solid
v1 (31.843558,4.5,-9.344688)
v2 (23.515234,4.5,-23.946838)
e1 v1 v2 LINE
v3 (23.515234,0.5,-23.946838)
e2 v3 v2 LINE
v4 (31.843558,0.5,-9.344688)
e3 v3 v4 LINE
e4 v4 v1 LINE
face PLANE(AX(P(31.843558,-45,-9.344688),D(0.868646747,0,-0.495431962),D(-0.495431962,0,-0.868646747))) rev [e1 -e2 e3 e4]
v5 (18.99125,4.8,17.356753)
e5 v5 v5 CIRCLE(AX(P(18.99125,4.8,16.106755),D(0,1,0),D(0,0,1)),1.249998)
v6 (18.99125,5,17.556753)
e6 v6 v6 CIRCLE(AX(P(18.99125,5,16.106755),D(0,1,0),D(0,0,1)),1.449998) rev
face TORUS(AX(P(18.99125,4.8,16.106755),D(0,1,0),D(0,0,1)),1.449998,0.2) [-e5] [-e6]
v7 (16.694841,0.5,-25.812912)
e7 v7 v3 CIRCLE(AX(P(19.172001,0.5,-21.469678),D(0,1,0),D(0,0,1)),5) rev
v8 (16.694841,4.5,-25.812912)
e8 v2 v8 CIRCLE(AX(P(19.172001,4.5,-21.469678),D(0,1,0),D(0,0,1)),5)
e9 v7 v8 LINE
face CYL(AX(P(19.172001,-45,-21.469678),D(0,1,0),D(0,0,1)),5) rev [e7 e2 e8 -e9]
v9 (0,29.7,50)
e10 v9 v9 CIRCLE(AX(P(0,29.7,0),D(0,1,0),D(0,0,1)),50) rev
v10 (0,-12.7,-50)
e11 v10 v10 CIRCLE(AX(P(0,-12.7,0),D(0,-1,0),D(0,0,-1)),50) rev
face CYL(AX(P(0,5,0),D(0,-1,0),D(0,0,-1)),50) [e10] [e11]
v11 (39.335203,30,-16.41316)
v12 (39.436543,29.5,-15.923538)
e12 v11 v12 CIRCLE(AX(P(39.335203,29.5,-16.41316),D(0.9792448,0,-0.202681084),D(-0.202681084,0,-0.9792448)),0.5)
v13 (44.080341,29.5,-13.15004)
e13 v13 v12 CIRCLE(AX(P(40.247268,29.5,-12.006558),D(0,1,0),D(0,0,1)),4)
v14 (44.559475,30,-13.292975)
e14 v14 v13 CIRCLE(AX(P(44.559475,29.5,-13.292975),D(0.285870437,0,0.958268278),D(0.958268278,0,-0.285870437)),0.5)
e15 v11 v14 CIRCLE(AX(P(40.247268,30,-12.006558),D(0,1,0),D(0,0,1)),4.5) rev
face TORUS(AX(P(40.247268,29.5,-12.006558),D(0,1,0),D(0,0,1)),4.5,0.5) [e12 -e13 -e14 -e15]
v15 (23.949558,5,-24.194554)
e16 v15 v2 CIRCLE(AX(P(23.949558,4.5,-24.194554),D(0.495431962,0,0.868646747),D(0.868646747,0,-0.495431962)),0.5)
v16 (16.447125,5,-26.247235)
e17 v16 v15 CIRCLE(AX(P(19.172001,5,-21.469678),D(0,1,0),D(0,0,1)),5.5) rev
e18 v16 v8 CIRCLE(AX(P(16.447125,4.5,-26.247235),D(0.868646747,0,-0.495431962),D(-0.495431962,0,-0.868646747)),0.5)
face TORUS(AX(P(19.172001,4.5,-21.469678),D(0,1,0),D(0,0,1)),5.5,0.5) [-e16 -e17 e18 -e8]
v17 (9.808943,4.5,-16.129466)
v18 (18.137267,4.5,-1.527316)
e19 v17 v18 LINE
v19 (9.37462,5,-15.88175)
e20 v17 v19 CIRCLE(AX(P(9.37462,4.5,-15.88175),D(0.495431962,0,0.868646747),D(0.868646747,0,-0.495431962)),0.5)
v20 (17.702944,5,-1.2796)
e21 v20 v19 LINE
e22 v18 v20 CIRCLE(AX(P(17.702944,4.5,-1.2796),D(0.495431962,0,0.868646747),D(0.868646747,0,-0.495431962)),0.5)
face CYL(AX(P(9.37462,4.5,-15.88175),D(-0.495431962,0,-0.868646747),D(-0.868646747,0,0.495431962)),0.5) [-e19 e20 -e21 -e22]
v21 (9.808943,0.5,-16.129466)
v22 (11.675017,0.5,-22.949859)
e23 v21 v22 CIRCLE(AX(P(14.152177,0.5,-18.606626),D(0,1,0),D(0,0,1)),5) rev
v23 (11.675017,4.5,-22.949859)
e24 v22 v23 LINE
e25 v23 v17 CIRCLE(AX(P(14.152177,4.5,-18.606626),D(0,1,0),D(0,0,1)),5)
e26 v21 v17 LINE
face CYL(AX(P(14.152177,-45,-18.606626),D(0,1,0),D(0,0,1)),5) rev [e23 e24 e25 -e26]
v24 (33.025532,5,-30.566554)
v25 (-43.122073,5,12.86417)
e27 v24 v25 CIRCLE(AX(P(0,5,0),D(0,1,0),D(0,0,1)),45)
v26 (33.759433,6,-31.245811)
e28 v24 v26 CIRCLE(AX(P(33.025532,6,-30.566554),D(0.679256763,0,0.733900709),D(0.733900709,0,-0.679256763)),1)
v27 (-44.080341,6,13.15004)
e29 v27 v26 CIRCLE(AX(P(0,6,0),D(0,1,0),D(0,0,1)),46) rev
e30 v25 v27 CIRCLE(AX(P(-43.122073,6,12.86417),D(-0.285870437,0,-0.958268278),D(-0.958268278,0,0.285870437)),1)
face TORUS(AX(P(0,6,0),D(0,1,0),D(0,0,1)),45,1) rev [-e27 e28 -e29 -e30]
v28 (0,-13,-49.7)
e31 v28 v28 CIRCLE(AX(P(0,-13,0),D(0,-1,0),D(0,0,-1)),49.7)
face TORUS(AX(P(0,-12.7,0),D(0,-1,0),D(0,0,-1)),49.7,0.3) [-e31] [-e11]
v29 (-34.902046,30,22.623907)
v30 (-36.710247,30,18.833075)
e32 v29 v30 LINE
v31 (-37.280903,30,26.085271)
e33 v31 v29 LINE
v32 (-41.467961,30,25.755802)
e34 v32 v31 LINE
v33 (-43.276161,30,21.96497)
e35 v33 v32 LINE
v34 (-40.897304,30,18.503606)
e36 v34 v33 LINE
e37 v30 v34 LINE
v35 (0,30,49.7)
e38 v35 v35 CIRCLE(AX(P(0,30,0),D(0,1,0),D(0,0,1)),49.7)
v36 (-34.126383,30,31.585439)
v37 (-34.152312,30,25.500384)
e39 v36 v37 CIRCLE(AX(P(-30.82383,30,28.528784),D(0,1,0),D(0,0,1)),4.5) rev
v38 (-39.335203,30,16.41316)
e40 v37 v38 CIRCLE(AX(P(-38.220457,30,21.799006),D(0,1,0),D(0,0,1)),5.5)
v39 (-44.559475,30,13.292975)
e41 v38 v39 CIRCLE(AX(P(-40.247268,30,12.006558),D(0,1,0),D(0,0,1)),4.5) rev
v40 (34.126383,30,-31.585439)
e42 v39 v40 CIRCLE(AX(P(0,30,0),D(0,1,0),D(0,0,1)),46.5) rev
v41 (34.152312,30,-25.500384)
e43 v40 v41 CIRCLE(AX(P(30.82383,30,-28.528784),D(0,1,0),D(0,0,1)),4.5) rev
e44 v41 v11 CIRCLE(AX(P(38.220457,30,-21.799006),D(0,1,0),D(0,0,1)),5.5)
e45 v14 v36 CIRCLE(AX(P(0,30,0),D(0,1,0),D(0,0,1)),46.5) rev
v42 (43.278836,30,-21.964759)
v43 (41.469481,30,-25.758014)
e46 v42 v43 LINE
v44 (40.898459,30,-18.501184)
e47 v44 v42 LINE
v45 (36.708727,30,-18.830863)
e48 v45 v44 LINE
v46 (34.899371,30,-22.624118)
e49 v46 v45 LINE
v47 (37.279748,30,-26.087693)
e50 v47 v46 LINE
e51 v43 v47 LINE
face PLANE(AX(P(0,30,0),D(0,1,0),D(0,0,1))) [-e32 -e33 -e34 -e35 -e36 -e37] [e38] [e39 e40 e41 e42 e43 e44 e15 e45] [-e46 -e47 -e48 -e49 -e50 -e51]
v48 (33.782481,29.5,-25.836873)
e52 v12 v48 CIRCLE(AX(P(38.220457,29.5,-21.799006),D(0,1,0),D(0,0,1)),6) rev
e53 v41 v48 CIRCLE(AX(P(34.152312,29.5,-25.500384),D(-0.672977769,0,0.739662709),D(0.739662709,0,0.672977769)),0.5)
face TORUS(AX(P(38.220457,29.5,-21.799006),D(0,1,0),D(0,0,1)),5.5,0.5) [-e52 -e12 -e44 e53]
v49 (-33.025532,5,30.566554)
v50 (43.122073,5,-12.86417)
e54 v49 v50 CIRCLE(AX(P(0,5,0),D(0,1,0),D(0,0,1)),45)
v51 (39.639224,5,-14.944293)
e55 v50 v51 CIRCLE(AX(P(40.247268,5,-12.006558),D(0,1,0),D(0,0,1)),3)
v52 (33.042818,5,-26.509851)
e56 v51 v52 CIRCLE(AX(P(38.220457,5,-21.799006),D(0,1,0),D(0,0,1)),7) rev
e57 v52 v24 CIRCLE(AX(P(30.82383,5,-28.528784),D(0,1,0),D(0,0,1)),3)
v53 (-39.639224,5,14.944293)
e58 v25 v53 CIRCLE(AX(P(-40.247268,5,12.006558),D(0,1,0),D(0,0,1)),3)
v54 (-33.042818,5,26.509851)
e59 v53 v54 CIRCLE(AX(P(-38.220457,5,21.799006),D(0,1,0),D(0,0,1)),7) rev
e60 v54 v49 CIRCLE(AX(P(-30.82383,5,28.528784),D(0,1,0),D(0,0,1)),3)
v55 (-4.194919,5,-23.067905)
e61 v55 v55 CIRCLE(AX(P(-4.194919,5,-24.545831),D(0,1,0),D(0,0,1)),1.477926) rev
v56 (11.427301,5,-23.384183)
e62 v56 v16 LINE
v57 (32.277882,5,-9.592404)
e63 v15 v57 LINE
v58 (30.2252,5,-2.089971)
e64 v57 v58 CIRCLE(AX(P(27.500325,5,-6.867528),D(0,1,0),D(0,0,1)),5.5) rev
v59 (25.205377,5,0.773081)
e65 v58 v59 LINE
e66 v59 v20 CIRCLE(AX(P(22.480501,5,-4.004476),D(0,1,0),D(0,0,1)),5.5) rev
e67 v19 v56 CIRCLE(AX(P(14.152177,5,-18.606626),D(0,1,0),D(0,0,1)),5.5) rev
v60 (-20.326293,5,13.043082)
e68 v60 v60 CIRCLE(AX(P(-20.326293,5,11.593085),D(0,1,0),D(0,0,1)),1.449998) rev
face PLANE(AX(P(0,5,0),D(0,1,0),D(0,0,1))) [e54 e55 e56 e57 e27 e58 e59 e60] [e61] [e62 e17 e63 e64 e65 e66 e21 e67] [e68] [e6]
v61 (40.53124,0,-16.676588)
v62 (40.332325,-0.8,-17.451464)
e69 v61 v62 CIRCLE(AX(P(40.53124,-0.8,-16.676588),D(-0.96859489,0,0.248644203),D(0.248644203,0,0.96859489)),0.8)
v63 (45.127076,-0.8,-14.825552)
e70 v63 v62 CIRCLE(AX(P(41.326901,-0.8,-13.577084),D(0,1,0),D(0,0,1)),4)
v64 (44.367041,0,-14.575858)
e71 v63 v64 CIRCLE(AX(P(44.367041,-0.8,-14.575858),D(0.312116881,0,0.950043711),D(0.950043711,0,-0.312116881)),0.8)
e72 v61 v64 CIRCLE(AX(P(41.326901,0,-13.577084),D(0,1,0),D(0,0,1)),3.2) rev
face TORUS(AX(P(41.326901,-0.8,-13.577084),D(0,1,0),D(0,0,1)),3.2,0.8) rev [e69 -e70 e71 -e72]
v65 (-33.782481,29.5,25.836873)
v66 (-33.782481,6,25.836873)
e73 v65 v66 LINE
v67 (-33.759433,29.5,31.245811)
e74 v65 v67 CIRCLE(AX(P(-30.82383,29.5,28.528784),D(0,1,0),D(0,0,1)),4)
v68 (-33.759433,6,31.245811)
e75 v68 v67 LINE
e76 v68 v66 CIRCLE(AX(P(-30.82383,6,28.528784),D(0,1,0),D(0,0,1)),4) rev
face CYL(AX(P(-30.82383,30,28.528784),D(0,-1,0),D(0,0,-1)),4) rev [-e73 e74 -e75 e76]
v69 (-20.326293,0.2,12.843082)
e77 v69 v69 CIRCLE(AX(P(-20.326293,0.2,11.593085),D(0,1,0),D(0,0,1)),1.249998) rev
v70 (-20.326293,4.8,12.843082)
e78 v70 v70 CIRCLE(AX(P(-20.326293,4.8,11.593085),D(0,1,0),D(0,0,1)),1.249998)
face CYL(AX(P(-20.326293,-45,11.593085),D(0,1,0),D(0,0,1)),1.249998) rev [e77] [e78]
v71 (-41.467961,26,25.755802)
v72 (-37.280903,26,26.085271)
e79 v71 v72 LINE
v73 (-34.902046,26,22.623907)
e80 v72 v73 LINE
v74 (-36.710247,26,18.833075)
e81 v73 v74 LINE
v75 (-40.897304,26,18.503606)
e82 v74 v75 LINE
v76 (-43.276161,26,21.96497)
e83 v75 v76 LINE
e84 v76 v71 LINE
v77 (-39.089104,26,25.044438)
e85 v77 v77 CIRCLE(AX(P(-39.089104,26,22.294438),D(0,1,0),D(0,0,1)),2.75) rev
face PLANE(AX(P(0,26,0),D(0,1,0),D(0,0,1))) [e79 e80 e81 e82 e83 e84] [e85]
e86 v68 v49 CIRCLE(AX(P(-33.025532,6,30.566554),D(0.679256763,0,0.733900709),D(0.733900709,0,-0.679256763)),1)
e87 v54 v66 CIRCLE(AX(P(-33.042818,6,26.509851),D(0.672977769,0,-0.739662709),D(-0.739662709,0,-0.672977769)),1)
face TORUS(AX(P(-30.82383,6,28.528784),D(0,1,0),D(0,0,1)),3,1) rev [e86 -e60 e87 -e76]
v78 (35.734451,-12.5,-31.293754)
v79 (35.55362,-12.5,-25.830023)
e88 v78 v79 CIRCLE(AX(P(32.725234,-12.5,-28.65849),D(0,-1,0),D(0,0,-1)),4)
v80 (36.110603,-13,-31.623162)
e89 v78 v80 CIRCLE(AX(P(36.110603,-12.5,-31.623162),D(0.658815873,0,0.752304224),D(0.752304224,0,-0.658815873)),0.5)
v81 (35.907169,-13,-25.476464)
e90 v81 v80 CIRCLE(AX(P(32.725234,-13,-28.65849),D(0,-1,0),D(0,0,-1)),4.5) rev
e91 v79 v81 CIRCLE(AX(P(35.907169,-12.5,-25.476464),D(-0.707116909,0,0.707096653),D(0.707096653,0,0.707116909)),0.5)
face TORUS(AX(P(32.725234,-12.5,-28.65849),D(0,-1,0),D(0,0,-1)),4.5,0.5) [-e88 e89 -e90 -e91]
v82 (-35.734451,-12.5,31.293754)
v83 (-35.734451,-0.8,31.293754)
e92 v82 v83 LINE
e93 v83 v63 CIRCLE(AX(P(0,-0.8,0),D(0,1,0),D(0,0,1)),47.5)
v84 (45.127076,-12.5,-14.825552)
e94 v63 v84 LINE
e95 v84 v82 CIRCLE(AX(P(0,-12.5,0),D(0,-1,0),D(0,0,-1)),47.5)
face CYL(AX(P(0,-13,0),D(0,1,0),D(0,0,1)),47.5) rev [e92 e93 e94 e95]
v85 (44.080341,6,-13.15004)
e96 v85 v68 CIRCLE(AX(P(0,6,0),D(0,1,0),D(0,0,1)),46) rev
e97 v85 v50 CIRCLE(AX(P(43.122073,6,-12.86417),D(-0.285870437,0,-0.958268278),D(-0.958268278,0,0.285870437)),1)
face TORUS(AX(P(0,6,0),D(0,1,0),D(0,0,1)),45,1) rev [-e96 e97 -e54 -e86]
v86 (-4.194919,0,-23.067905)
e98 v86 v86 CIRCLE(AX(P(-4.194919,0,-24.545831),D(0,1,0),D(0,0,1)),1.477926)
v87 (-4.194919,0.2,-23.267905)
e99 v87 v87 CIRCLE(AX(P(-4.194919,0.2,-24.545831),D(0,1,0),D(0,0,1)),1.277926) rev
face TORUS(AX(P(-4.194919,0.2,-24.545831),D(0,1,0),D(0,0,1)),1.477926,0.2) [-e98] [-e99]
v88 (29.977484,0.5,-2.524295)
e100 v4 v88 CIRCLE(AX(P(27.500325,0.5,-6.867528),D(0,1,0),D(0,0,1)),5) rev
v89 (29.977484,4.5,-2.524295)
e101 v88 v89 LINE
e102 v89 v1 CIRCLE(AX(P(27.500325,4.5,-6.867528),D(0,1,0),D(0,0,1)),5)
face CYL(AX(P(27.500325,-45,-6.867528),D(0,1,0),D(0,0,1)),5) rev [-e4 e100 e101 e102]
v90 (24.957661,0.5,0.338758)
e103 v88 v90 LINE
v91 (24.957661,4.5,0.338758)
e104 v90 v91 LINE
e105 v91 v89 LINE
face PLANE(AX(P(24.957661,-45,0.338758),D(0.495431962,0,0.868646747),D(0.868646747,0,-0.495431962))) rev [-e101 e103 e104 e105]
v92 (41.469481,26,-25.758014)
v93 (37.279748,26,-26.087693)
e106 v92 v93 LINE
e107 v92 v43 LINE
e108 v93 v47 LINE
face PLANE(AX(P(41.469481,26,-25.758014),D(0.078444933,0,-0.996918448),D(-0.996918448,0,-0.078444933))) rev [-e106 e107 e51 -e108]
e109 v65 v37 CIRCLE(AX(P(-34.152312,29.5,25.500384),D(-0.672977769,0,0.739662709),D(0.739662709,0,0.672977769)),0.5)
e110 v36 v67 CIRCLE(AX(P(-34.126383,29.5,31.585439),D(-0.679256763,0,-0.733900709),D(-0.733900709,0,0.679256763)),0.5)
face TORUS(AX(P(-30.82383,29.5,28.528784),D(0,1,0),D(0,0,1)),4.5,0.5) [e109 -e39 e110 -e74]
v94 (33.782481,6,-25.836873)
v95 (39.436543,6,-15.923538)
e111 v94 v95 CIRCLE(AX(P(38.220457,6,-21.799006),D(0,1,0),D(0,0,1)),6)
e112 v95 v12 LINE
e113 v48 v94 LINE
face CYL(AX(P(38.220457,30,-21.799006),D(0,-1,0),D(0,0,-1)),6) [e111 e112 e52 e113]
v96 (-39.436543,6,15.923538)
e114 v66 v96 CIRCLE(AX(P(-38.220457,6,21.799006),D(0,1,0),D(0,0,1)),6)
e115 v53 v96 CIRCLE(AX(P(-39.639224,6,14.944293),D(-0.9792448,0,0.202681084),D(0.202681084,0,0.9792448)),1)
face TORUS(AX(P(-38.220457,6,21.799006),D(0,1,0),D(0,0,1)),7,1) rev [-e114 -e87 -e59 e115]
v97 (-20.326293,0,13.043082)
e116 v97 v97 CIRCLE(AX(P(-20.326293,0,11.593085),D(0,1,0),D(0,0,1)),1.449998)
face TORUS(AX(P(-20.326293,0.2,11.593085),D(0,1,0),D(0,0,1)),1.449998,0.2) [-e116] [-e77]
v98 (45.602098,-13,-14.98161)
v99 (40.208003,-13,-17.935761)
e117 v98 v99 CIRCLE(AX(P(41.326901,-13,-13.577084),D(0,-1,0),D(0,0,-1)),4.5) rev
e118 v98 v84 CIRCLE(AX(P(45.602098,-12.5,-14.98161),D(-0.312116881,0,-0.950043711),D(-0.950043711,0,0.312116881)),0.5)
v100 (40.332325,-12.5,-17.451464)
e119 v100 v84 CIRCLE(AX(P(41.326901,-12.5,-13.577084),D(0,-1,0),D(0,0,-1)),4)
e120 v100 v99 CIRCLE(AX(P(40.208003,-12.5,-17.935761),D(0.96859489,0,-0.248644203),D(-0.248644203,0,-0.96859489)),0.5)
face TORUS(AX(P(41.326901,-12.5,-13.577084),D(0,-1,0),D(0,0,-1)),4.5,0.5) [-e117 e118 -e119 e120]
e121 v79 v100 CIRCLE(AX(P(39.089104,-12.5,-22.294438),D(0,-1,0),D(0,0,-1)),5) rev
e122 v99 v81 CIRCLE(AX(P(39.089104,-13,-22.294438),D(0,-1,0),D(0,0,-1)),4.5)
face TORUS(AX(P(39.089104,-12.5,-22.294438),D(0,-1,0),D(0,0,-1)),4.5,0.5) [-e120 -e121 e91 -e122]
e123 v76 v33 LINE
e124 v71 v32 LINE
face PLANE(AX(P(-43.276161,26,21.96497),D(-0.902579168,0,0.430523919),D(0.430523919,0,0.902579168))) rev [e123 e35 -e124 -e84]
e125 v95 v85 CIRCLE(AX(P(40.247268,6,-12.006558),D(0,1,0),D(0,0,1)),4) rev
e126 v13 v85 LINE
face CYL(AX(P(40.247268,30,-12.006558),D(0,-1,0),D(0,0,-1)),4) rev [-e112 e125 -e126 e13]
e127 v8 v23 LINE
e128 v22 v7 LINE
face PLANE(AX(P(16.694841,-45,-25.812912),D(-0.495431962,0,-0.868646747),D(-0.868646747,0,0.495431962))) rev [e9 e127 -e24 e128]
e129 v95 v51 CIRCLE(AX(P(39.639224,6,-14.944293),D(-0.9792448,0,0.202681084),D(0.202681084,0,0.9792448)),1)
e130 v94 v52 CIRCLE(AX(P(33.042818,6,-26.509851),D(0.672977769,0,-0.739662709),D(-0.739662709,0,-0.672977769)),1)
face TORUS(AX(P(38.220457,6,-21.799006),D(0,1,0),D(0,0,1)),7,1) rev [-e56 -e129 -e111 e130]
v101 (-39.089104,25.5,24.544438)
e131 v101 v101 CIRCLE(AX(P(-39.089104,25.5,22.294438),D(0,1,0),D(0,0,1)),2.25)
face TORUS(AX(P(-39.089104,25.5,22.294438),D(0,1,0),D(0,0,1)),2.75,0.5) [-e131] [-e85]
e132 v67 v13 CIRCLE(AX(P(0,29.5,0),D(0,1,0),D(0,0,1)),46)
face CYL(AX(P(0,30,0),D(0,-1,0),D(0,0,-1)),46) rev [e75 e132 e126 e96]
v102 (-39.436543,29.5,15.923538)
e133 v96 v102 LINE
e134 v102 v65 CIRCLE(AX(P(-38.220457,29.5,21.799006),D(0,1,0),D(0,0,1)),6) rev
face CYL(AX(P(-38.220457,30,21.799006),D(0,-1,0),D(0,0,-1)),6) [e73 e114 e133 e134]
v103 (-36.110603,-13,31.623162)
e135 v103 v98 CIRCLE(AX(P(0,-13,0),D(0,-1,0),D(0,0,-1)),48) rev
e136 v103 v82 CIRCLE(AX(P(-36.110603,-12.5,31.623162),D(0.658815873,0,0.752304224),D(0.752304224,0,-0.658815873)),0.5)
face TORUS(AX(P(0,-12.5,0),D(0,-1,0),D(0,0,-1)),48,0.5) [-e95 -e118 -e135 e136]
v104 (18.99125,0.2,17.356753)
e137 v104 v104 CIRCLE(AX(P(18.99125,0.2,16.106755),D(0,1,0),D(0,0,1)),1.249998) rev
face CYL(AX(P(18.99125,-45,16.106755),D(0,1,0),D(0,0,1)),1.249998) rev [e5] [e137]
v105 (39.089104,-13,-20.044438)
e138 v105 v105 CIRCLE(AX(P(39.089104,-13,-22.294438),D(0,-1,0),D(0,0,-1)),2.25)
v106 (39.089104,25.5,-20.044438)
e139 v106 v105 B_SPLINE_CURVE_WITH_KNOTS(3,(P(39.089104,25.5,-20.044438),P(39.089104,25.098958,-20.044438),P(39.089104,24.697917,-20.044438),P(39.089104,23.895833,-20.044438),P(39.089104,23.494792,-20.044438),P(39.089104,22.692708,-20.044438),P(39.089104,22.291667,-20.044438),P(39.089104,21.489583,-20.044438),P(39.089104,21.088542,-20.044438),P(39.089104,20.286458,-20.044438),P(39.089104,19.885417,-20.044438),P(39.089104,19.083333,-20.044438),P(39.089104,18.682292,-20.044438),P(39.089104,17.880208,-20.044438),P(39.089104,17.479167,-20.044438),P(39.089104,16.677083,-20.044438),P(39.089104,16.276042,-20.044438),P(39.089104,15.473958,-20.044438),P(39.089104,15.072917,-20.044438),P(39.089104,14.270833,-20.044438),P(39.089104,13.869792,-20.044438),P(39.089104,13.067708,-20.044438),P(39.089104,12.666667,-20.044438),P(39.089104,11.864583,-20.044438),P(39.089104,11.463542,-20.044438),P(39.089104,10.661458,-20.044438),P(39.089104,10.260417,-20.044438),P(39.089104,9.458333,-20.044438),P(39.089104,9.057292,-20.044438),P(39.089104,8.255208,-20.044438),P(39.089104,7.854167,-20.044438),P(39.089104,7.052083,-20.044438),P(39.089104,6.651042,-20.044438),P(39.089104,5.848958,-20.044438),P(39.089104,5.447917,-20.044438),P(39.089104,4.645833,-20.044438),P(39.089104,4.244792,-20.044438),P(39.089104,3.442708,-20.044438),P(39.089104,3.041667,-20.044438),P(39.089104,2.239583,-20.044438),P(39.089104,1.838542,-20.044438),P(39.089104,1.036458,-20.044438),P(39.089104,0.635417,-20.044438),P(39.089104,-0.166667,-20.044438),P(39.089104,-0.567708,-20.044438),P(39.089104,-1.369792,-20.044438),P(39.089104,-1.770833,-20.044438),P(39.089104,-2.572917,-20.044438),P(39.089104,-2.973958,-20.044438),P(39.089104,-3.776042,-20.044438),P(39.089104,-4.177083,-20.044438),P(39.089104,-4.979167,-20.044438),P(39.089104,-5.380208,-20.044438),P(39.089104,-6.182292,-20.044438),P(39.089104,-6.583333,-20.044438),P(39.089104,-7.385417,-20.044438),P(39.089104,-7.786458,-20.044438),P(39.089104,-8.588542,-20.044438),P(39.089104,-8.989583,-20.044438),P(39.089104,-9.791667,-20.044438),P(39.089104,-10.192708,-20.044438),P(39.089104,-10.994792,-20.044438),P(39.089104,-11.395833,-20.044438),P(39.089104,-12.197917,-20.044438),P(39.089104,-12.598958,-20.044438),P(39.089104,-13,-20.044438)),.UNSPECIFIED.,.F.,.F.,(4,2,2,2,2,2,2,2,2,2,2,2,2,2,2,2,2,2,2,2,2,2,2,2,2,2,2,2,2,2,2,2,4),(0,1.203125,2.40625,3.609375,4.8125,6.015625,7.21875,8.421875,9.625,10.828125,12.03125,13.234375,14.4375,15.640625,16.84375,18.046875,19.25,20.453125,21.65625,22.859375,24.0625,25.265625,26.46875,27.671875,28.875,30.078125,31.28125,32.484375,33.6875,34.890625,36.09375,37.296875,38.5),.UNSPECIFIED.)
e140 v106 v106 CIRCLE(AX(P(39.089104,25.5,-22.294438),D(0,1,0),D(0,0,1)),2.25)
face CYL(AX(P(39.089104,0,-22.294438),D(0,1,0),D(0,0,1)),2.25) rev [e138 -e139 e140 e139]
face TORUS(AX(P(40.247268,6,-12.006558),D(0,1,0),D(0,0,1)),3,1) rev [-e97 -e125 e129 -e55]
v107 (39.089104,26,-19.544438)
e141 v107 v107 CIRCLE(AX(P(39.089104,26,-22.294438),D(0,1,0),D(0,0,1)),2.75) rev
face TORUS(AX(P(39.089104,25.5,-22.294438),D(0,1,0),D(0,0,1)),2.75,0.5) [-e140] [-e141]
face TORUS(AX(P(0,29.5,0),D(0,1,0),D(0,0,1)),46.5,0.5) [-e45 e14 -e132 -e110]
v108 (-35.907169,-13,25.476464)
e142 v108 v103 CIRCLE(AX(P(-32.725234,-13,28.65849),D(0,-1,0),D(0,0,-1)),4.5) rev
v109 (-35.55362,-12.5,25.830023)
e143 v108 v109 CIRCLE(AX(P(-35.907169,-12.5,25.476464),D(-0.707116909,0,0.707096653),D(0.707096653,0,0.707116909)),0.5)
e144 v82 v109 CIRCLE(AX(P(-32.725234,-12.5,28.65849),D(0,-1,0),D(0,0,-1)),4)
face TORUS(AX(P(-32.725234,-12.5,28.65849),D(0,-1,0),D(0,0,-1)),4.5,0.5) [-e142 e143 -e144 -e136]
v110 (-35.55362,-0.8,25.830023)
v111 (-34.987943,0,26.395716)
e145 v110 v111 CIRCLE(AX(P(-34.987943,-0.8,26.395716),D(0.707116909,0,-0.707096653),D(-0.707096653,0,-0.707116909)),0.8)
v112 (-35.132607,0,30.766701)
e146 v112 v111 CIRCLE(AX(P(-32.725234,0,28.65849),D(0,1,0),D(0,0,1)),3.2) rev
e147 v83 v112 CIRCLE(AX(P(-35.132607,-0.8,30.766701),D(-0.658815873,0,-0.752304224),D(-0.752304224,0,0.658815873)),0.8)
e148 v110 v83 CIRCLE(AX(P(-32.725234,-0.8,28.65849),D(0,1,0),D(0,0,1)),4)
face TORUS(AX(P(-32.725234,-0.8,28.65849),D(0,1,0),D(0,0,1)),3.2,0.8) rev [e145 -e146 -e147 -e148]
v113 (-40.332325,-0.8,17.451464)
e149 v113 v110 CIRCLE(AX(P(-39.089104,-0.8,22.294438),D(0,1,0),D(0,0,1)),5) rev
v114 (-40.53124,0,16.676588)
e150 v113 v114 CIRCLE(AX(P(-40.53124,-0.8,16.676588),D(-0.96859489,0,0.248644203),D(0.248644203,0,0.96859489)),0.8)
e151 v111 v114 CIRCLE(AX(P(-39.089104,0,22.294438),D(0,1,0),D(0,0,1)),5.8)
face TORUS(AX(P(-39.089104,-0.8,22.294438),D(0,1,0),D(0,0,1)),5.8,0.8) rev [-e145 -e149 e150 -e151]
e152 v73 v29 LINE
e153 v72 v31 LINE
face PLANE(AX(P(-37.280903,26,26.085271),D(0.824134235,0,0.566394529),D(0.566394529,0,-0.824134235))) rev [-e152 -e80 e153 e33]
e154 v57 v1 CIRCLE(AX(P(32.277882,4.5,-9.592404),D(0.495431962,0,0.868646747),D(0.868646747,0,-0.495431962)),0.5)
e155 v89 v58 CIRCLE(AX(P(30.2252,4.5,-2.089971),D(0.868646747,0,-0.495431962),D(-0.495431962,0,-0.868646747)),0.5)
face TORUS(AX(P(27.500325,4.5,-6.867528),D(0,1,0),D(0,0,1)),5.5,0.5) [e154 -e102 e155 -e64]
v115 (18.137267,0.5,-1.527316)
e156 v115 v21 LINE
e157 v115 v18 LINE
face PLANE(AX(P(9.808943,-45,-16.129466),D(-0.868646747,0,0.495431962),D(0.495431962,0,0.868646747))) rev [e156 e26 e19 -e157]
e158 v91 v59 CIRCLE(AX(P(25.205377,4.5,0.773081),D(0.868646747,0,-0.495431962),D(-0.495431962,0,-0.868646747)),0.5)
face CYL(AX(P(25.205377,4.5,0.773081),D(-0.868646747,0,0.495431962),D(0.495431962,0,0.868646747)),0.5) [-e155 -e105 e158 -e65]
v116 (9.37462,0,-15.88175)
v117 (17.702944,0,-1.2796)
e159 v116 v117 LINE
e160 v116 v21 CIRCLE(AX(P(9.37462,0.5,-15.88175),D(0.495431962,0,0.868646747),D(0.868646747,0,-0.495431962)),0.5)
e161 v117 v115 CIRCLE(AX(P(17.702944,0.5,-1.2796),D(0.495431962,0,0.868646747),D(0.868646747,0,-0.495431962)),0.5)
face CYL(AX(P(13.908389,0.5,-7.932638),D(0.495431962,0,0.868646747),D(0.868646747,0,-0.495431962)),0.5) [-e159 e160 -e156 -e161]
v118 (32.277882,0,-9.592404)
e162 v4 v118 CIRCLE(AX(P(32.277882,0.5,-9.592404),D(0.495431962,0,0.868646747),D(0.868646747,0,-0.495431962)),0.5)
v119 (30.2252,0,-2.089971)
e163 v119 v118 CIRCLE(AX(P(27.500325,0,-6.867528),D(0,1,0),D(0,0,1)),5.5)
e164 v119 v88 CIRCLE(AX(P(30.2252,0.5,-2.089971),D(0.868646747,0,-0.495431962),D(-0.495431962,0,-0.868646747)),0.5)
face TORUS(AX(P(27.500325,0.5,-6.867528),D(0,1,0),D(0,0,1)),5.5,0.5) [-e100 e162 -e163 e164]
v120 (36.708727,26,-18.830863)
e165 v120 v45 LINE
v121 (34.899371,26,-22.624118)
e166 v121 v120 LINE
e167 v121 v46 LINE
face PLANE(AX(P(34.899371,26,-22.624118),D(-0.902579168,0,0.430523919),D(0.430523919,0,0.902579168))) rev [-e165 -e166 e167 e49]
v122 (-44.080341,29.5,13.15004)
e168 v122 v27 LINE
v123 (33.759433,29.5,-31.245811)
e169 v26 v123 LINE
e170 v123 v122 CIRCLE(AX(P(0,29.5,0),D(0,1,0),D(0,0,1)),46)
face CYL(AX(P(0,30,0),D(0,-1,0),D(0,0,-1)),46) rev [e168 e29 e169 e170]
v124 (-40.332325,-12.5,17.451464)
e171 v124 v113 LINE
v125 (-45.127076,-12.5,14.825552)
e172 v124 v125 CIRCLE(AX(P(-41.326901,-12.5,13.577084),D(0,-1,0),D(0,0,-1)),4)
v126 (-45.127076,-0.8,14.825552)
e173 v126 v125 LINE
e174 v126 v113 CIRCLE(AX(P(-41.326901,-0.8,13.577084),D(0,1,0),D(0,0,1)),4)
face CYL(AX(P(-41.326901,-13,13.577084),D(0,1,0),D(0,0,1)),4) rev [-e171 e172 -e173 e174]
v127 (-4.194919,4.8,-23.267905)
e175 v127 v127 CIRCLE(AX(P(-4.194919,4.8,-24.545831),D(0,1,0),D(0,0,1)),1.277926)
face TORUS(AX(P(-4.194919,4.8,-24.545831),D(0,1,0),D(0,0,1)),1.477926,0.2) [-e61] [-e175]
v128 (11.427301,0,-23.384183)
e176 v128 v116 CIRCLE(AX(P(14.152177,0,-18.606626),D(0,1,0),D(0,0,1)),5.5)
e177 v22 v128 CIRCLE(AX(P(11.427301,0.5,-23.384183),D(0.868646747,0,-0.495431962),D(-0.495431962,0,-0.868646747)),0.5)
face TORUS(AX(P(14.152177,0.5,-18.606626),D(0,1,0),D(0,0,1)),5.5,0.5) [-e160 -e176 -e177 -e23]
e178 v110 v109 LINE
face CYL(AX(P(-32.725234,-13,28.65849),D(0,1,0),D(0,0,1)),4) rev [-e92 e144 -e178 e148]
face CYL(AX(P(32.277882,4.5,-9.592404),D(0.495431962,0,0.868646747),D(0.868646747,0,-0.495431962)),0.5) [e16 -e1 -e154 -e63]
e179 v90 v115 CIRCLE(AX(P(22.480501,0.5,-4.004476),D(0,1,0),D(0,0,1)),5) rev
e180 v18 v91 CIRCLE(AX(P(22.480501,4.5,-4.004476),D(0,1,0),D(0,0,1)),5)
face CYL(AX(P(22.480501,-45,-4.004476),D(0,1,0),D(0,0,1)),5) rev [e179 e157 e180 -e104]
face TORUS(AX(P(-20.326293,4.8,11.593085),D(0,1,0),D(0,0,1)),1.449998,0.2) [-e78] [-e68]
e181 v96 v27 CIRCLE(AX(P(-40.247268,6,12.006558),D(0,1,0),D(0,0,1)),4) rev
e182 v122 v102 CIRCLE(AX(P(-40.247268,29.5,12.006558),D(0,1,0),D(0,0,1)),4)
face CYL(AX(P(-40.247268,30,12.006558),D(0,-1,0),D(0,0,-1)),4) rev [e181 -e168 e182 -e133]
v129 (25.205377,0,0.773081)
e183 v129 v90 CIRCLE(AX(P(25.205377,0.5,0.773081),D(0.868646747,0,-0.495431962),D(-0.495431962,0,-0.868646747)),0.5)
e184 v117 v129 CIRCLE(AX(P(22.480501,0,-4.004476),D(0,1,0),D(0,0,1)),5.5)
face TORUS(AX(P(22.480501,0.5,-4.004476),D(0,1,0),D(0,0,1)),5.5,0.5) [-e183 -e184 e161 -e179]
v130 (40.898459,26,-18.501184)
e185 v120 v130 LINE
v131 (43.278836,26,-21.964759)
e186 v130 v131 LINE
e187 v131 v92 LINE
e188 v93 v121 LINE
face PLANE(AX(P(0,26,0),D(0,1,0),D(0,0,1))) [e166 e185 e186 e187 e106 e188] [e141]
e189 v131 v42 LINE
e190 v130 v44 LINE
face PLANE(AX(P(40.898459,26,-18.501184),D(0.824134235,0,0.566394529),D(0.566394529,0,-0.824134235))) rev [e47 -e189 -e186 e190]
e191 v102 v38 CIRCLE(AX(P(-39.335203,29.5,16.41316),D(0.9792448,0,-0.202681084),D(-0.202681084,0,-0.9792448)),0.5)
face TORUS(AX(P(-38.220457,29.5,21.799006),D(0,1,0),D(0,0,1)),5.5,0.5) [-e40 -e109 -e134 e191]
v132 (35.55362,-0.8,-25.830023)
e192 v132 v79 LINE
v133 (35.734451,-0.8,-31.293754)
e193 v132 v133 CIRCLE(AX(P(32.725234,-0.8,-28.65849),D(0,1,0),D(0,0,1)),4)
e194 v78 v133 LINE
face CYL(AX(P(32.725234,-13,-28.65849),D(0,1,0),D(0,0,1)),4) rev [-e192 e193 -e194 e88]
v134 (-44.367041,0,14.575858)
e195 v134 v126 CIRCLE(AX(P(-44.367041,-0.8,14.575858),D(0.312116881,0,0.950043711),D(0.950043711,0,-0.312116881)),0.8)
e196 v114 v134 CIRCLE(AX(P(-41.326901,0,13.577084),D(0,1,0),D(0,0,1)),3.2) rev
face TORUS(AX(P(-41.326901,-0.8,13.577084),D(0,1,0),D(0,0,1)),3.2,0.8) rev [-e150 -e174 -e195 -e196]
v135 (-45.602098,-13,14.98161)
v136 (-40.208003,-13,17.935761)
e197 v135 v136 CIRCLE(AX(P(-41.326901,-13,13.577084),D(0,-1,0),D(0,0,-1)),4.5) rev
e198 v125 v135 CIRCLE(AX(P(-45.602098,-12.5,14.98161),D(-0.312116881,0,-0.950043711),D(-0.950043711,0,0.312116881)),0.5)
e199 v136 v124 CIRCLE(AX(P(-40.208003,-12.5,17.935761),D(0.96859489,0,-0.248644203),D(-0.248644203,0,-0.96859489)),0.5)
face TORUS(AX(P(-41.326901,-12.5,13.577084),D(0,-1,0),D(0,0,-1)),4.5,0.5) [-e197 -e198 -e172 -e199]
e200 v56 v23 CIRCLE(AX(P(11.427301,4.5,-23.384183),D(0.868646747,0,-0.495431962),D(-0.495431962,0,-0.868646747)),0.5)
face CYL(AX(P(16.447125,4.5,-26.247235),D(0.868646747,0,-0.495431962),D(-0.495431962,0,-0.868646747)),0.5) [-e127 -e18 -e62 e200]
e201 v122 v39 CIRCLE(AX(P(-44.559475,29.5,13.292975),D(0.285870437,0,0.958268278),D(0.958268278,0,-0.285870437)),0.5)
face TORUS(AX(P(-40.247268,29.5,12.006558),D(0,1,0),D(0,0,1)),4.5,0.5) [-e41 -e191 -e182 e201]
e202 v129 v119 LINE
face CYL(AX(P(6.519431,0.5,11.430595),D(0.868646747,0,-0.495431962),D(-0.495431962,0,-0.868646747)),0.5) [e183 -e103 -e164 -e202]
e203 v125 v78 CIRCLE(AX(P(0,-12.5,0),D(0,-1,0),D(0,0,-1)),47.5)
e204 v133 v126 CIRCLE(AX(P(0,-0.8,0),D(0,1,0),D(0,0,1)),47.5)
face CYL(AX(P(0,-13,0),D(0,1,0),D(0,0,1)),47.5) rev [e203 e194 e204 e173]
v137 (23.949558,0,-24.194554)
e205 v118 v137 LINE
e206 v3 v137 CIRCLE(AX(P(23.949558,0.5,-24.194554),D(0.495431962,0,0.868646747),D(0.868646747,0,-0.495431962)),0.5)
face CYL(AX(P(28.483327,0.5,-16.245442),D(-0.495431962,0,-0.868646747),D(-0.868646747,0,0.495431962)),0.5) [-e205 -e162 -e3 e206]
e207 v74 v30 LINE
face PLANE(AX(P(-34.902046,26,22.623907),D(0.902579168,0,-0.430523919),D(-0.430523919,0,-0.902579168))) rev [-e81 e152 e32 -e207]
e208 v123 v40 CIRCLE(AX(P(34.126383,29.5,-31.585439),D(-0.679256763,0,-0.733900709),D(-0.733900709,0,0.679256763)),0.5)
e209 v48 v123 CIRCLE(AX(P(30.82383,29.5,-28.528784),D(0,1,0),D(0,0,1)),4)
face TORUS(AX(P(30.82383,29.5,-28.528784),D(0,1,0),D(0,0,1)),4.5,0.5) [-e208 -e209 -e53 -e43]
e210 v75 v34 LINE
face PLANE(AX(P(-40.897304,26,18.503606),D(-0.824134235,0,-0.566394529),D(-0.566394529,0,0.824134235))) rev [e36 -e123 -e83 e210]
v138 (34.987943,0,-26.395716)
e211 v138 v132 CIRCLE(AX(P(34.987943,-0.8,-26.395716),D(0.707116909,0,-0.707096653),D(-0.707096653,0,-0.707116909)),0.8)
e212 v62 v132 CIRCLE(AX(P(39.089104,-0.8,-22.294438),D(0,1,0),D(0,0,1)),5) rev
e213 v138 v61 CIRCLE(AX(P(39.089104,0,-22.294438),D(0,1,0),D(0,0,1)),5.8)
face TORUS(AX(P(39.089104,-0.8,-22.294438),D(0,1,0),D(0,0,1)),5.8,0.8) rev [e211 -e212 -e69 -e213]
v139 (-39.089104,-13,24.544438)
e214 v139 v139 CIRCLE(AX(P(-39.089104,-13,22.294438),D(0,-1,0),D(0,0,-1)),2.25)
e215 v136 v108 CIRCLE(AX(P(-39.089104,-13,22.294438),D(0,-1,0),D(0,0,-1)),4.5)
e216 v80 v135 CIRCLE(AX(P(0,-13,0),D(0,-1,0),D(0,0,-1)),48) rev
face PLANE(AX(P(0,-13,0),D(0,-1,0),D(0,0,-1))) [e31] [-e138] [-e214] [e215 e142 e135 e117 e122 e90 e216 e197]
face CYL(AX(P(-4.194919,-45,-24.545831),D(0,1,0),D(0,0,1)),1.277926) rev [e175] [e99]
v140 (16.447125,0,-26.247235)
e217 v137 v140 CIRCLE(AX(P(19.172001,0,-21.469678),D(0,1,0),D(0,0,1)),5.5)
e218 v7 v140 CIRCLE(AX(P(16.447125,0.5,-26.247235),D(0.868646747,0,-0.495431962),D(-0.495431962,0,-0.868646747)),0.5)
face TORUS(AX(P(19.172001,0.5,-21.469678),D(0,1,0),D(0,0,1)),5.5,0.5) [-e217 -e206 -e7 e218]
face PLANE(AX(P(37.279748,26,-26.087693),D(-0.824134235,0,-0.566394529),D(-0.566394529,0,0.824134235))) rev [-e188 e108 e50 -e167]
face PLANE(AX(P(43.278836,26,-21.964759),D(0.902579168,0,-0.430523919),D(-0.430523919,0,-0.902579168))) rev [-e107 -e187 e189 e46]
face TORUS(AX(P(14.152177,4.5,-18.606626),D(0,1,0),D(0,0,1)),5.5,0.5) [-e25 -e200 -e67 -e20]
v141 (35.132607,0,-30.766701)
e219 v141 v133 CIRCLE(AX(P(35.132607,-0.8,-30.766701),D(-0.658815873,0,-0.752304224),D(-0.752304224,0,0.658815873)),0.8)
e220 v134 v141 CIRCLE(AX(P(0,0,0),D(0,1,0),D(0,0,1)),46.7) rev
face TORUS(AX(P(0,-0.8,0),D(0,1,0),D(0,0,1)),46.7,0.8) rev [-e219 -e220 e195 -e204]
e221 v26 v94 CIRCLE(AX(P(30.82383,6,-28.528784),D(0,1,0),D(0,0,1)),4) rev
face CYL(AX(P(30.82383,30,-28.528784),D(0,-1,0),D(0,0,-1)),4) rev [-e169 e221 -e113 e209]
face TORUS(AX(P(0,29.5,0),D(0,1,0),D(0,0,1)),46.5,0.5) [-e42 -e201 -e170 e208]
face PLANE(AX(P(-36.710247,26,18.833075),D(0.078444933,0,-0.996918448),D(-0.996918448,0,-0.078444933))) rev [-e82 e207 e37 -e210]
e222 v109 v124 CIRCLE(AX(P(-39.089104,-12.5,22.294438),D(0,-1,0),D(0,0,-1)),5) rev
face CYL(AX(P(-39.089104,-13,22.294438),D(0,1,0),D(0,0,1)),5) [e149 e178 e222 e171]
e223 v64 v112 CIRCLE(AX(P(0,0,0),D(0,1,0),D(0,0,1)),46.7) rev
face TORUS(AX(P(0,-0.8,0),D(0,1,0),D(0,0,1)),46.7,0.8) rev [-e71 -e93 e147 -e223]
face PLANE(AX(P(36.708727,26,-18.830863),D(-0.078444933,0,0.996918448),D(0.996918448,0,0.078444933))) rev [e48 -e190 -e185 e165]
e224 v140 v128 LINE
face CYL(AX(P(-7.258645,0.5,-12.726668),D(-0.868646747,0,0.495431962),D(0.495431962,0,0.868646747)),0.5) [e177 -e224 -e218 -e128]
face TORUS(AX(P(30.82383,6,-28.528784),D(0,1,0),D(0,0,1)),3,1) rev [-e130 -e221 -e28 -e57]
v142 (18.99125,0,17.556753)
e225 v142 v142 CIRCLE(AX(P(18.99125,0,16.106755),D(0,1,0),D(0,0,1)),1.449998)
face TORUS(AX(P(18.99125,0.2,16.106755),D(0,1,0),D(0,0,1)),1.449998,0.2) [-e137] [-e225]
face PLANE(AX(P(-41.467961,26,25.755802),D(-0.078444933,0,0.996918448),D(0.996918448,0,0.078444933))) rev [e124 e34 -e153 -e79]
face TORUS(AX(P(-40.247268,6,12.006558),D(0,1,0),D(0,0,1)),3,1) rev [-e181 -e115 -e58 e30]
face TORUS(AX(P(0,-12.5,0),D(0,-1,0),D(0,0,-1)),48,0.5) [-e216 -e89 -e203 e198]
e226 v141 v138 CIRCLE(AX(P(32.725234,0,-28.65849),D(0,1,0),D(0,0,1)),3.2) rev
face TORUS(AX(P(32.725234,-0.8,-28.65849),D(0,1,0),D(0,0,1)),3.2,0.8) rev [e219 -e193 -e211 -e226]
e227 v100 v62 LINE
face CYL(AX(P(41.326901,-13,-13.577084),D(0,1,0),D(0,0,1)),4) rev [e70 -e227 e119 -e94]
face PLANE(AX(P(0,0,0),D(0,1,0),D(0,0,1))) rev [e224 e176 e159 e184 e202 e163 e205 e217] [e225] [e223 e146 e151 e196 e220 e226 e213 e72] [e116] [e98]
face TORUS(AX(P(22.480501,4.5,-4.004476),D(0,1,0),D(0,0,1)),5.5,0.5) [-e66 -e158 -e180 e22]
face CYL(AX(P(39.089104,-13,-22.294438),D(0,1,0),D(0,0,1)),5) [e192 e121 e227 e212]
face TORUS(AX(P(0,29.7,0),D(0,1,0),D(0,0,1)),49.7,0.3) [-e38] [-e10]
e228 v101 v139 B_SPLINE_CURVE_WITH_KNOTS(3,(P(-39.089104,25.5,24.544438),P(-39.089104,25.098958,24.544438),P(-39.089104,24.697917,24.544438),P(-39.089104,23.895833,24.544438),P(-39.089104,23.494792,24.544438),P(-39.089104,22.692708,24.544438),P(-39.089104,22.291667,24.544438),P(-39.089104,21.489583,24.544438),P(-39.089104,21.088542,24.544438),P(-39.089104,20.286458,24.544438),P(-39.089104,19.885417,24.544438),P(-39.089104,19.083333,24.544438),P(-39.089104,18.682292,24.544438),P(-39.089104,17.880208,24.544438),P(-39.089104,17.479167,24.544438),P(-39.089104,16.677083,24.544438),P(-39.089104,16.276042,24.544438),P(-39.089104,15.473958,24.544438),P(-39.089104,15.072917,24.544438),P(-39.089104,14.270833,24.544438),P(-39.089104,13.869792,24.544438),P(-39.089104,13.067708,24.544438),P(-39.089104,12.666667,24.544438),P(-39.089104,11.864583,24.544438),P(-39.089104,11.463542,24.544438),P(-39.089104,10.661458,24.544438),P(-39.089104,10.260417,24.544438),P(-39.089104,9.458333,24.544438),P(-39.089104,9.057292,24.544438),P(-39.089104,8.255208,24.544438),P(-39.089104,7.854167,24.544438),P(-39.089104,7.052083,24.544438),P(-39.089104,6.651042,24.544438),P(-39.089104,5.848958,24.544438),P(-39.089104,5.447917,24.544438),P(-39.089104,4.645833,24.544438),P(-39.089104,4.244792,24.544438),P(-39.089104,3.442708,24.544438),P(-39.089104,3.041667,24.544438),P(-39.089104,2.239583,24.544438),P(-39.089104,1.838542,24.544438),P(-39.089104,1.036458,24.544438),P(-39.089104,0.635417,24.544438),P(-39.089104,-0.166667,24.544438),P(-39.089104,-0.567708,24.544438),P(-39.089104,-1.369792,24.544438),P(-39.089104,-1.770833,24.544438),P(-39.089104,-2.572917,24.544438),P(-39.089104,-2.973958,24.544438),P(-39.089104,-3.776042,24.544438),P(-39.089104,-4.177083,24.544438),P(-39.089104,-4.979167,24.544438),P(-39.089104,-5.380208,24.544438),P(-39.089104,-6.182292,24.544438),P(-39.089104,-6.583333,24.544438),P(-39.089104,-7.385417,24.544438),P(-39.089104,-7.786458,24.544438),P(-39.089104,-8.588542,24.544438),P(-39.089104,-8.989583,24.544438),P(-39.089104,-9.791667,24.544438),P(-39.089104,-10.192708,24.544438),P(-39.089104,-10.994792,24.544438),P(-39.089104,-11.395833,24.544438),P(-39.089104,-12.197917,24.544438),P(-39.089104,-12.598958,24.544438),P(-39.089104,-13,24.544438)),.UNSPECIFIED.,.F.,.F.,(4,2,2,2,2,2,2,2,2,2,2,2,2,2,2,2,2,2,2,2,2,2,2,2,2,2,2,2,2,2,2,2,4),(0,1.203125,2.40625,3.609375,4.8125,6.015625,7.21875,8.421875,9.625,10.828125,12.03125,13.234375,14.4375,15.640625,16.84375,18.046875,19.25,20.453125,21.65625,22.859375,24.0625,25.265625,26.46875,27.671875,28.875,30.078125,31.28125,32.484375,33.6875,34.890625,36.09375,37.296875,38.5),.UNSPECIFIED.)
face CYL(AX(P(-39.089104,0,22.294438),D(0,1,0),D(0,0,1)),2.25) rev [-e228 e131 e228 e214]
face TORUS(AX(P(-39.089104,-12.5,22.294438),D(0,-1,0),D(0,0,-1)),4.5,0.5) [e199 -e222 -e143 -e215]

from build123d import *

# Parameters (mm, degrees)
SKETCH1_R           = 50
BOSS_EXTRUDE1_DEPTH = 5
SKETCH3_R           = 1.2499975
SKETCH3_R_2         = 1.277925548
CUT_EXTRUDE2_DEPTH  = 50
SKETCH2_R           = 50
BOSS_EXTRUDE2_DEPTH = 25
SKETCH4_R           = 2.25
CUT_EXTRUDE3_DEPTH  = 77.811457479
CUT_EXTRUDE4_DEPTH  = 4
SKETCH6_R           = 50
SKETCH6_R_2         = 2.25
BOSS_EXTRUDE3_DEPTH = 13
FILLET1_R           = 4
FILLET2_R           = 0.5
FILLET3_R           = 0.8
FILLET4_R           = 0.3
FILLET5_R           = 4
FILLET6_R           = 0.5
FILLET7_R           = 1
FILLET8_R           = 0.5
FILLET9_R           = 0.2


with BuildPart() as part:
    # Sketch1 → Boss-Extrude1 (new body)
    with BuildSketch(Plane(origin=(0, 0, 0), x_dir=(1, 0, 0), z_dir=(0, 1, 0))):
        Circle(SKETCH1_R)
    extrude(amount=BOSS_EXTRUDE1_DEPTH)

    # Sketch3 → Cut-Extrude2 (cut)
    with BuildSketch(Plane(origin=(0, 5, 0), x_dir=(1, 0, 0), z_dir=(0, 1, 0))):
        with Locations((18.99125044, -16.106755454)):
            Circle(SKETCH3_R)
        with Locations((-20.326293221, -11.593084735)):
            Circle(SKETCH3_R)
        with Locations((-4.19491903, 24.545830987)):
            Circle(SKETCH3_R_2)
        with BuildLine():
            Line((9.808943392, 16.129465755), (18.137267372, 1.52731636))
            ThreePointArc((18.137267372, 1.52731636), (21.160987581, -0.818270354), (24.957660917, -0.338757561))
            Line((24.957660917, -0.338757561), (29.977484456, 2.524294694))
            ThreePointArc((29.977484456, 2.524294694), (32.323071171, 5.548014904), (31.843558378, 9.34468824))
            Line((31.843558378, 9.34468824), (23.515234398, 23.946837635))
            ThreePointArc((23.515234398, 23.946837635), (20.491514188, 26.292424349), (16.694840852, 25.812911556))
            Line((16.694840852, 25.812911556), (11.675017313, 22.949859301))
            ThreePointArc((11.675017313, 22.949859301), (9.329430599, 19.926139091), (9.808943392, 16.129465755))
        make_face()
    extrude(amount=-CUT_EXTRUDE2_DEPTH, mode=Mode.SUBTRACT)

    # Sketch2 → Boss-Extrude2 (add)
    with BuildSketch(Plane(origin=(0, 5, 0), x_dir=(1, 0, 0), z_dir=(0, 1, 0))):
        Circle(SKETCH2_R)
        with BuildLine():
            ThreePointArc((-36.781973865, -27.624018509), (22.789870272, -39.957750349), (42.501783745, 17.595407881))
            ThreePointArc((42.501783745, 17.595407881), (33.008576375, 18.826414573), (36.781973865, 27.624018509))
            ThreePointArc((36.781973865, 27.624018509), (-22.789870272, 39.957750349), (-42.501783745, -17.595407881))
            ThreePointArc((-42.501783745, -17.595407881), (-33.008576375, -18.826414573), (-36.781973865, -27.624018509))
        make_face(mode=Mode.SUBTRACT)
    extrude(amount=BOSS_EXTRUDE2_DEPTH)

    # Sketch4 → Cut-Extrude3 (cut, through all)
    with BuildSketch(Plane(origin=(0, 30, 0), x_dir=(1, 0, 0), z_dir=(0, 1, 0))):
        with Locations((39.089103602, 22.29443831)):
            Circle(SKETCH4_R)
        with Locations((-39.089103602, -22.29443831)):
            Circle(SKETCH4_R)
    extrude(amount=-CUT_EXTRUDE3_DEPTH, mode=Mode.SUBTRACT)

    # Sketch5 → Cut-Extrude4 (cut)
    with BuildSketch(Plane(origin=(0, 30, 0), x_dir=(1, 0, 0), z_dir=(0, 1, 0))):
        Polygon((37.27974776, 26.087693038), (34.899370723, 22.62411755), (36.708726566, 18.830862822), (40.898459445, 18.501183582), (43.278836481, 21.96475907), (41.469480639, 25.758013798), align=None)
        Polygon((-40.897304063, -18.503605803), (-43.276161085, -21.96496959), (-41.467960625, -25.755802097), (-37.280903142, -26.085270817), (-34.90204612, -22.62390703), (-36.71024658, -18.833074523), align=None)
    extrude(amount=-CUT_EXTRUDE4_DEPTH, mode=Mode.SUBTRACT)

    # Sketch6 → Boss-Extrude3 (add)
    with BuildSketch(Plane.XZ):
        Circle(SKETCH6_R)
        with Locations((39.089103602, -22.29443831)):
            Circle(SKETCH6_R_2, mode=Mode.SUBTRACT)
        with Locations((-39.089103602, 22.29443831)):
            Circle(SKETCH6_R_2, mode=Mode.SUBTRACT)
        with BuildLine():
            ThreePointArc((-43.281403425, 19.569622316), (-23.533018216, -41.260720469), (38.878101369, -27.289984132))
            ThreePointArc((38.878101369, -27.289984132), (34.745869869, -19.817278498), (43.281403425, -19.569622316))
            ThreePointArc((43.281403425, -19.569622316), (23.533018216, 41.260720469), (-38.878101369, 27.289984132))
            ThreePointArc((-38.878101369, 27.289984132), (-34.745869869, 19.817278498), (-43.281403425, 19.569622316))
        make_face(mode=Mode.SUBTRACT)
    extrude(amount=BOSS_EXTRUDE3_DEPTH)

    # Fillet1
    fillet1_edges = [part.edges().sort_by_distance(p)[0] for p in [
        (43.281403425, -6.5, -19.569622316),
        (38.878101369, -6.5, -27.289984132),
        (-43.281403425, -6.5, 19.569622316),
        (-38.878101369, -6.5, 27.289984132),
    ]]
    fillet(fillet1_edges, radius=FILLET1_R)

    # Fillet2
    fillet2_edges = [part.edges().sort_by_distance(p)[0] for p in [
        (43.248280775, -13, -17.08540319),
        (34.745869869, -13, -19.817278498),
        (36.723044771, -13, -28.526177011),
        (-23.533018216, -13, -41.260720469),
        (-43.248280775, -13, 17.08540319),
        (-34.745869869, -13, 19.817278498),
        (-36.723044771, -13, 28.526177011),
        (23.533018216, -13, 41.260720469),
    ]]
    fillet(fillet2_edges, radius=FILLET2_R)

    # Fillet3
    fillet3_edges = [part.edges().sort_by_distance(p)[0] for p in [
        (43.248280775, 0, -17.08540319),
        (34.745869869, 0, -19.817278498),
        (36.723044771, 0, -28.526177011),
        (-23.533018216, 0, -41.260720469),
        (-43.248280775, 0, 17.08540319),
        (-34.745869869, 0, 19.817278498),
        (-36.723044771, 0, 28.526177011),
        (23.533018216, 0, 41.260720469),
    ]]
    fillet(fillet3_edges, radius=FILLET3_R)

    # Fillet4
    fillet4_edges = [part.edges().sort_by_distance(p)[0] for p in [
        (-50, 30, 0),
        (-50, -13, 0),
    ]]
    fillet(fillet4_edges, radius=FILLET4_R)

    # Fillet5
    fillet5_edges = [part.edges().sort_by_distance(p)[0] for p in [
        (42.501783745, 17.5, -17.595407881),
        (36.781973865, 17.5, -27.624018509),
        (-36.781973865, 17.5, 27.624018509),
        (-42.501783745, 17.5, 17.595407881),
    ]]
    fillet(fillet5_edges, radius=FILLET5_R)

    # Fillet6
    fillet6_edges = [part.edges().sort_by_distance(p)[0] for p in [
        (-34.823793454, 30, 28.54582826),
        (-33.008576375, 30, 18.826414573),
        (-42.298296718, 30, 15.440692872),
        (-22.789870272, 30, -39.957750349),
        (34.823793454, 30, -28.54582826),
        (33.008576375, 30, -18.826414573),
        (42.298296718, 30, -15.440692872),
        (22.789870272, 30, 39.957750349),
        (-41.339103602, 26, 22.29443831),
        (36.839103602, 26, -22.29443831),
    ]]
    fillet(fillet6_edges, radius=FILLET6_R)

    # Fillet7
    fillet7_edges = [part.edges().sort_by_distance(p)[0] for p in [
        (-34.823793454, 5, 28.54582826),
        (-33.008576375, 5, 18.826414573),
        (-42.298296718, 5, 15.440692872),
        (-22.789870272, 5, -39.957750349),
        (34.823793454, 5, -28.54582826),
        (33.008576375, 5, -18.826414573),
        (42.298296718, 5, -15.440692872),
        (22.789870272, 5, 39.957750349),
    ]]
    fillet(fillet7_edges, radius=FILLET7_R)

    # Fillet8
    fillet8_edges = [part.edges().sort_by_distance(p)[0] for p in [
        (32.323071171, 0, -5.548014904),
        (27.467572687, 0, -1.092768567),
        (21.160987581, 0, 0.818270354),
        (13.973105382, 0, -8.828391058),
        (9.329430599, 0, -19.926139091),
        (14.184929083, 0, -24.381385429),
        (20.491514188, 0, -26.292424349),
        (32.323071171, 5, -5.548014904),
        (27.467572687, 5, -1.092768567),
        (21.160987581, 5, 0.818270354),
        (13.973105382, 5, -8.828391058),
        (9.329430599, 5, -19.926139091),
        (14.184929083, 5, -24.381385429),
        (20.491514188, 5, -26.292424349),
        (27.679396388, 0, -16.645762937),
        (27.679396388, 5, -16.645762937),
    ]]
    fillet(fillet8_edges, radius=FILLET8_R)

    # Fillet9
    fillet9_edges = [part.edges().sort_by_distance(p)[0] for p in [
        (-5.472844578, 0, -24.545830987),
        (-5.472844578, 5, -24.545830987),
        (-21.576290721, 0, 11.593084735),
        (-21.576290721, 5, 11.593084735),
        (17.74125294, 0, 16.106755454),
        (17.74125294, 5, 16.106755454),
    ]]
    fillet(fillet9_edges, radius=FILLET9_R)


solid = part.part
